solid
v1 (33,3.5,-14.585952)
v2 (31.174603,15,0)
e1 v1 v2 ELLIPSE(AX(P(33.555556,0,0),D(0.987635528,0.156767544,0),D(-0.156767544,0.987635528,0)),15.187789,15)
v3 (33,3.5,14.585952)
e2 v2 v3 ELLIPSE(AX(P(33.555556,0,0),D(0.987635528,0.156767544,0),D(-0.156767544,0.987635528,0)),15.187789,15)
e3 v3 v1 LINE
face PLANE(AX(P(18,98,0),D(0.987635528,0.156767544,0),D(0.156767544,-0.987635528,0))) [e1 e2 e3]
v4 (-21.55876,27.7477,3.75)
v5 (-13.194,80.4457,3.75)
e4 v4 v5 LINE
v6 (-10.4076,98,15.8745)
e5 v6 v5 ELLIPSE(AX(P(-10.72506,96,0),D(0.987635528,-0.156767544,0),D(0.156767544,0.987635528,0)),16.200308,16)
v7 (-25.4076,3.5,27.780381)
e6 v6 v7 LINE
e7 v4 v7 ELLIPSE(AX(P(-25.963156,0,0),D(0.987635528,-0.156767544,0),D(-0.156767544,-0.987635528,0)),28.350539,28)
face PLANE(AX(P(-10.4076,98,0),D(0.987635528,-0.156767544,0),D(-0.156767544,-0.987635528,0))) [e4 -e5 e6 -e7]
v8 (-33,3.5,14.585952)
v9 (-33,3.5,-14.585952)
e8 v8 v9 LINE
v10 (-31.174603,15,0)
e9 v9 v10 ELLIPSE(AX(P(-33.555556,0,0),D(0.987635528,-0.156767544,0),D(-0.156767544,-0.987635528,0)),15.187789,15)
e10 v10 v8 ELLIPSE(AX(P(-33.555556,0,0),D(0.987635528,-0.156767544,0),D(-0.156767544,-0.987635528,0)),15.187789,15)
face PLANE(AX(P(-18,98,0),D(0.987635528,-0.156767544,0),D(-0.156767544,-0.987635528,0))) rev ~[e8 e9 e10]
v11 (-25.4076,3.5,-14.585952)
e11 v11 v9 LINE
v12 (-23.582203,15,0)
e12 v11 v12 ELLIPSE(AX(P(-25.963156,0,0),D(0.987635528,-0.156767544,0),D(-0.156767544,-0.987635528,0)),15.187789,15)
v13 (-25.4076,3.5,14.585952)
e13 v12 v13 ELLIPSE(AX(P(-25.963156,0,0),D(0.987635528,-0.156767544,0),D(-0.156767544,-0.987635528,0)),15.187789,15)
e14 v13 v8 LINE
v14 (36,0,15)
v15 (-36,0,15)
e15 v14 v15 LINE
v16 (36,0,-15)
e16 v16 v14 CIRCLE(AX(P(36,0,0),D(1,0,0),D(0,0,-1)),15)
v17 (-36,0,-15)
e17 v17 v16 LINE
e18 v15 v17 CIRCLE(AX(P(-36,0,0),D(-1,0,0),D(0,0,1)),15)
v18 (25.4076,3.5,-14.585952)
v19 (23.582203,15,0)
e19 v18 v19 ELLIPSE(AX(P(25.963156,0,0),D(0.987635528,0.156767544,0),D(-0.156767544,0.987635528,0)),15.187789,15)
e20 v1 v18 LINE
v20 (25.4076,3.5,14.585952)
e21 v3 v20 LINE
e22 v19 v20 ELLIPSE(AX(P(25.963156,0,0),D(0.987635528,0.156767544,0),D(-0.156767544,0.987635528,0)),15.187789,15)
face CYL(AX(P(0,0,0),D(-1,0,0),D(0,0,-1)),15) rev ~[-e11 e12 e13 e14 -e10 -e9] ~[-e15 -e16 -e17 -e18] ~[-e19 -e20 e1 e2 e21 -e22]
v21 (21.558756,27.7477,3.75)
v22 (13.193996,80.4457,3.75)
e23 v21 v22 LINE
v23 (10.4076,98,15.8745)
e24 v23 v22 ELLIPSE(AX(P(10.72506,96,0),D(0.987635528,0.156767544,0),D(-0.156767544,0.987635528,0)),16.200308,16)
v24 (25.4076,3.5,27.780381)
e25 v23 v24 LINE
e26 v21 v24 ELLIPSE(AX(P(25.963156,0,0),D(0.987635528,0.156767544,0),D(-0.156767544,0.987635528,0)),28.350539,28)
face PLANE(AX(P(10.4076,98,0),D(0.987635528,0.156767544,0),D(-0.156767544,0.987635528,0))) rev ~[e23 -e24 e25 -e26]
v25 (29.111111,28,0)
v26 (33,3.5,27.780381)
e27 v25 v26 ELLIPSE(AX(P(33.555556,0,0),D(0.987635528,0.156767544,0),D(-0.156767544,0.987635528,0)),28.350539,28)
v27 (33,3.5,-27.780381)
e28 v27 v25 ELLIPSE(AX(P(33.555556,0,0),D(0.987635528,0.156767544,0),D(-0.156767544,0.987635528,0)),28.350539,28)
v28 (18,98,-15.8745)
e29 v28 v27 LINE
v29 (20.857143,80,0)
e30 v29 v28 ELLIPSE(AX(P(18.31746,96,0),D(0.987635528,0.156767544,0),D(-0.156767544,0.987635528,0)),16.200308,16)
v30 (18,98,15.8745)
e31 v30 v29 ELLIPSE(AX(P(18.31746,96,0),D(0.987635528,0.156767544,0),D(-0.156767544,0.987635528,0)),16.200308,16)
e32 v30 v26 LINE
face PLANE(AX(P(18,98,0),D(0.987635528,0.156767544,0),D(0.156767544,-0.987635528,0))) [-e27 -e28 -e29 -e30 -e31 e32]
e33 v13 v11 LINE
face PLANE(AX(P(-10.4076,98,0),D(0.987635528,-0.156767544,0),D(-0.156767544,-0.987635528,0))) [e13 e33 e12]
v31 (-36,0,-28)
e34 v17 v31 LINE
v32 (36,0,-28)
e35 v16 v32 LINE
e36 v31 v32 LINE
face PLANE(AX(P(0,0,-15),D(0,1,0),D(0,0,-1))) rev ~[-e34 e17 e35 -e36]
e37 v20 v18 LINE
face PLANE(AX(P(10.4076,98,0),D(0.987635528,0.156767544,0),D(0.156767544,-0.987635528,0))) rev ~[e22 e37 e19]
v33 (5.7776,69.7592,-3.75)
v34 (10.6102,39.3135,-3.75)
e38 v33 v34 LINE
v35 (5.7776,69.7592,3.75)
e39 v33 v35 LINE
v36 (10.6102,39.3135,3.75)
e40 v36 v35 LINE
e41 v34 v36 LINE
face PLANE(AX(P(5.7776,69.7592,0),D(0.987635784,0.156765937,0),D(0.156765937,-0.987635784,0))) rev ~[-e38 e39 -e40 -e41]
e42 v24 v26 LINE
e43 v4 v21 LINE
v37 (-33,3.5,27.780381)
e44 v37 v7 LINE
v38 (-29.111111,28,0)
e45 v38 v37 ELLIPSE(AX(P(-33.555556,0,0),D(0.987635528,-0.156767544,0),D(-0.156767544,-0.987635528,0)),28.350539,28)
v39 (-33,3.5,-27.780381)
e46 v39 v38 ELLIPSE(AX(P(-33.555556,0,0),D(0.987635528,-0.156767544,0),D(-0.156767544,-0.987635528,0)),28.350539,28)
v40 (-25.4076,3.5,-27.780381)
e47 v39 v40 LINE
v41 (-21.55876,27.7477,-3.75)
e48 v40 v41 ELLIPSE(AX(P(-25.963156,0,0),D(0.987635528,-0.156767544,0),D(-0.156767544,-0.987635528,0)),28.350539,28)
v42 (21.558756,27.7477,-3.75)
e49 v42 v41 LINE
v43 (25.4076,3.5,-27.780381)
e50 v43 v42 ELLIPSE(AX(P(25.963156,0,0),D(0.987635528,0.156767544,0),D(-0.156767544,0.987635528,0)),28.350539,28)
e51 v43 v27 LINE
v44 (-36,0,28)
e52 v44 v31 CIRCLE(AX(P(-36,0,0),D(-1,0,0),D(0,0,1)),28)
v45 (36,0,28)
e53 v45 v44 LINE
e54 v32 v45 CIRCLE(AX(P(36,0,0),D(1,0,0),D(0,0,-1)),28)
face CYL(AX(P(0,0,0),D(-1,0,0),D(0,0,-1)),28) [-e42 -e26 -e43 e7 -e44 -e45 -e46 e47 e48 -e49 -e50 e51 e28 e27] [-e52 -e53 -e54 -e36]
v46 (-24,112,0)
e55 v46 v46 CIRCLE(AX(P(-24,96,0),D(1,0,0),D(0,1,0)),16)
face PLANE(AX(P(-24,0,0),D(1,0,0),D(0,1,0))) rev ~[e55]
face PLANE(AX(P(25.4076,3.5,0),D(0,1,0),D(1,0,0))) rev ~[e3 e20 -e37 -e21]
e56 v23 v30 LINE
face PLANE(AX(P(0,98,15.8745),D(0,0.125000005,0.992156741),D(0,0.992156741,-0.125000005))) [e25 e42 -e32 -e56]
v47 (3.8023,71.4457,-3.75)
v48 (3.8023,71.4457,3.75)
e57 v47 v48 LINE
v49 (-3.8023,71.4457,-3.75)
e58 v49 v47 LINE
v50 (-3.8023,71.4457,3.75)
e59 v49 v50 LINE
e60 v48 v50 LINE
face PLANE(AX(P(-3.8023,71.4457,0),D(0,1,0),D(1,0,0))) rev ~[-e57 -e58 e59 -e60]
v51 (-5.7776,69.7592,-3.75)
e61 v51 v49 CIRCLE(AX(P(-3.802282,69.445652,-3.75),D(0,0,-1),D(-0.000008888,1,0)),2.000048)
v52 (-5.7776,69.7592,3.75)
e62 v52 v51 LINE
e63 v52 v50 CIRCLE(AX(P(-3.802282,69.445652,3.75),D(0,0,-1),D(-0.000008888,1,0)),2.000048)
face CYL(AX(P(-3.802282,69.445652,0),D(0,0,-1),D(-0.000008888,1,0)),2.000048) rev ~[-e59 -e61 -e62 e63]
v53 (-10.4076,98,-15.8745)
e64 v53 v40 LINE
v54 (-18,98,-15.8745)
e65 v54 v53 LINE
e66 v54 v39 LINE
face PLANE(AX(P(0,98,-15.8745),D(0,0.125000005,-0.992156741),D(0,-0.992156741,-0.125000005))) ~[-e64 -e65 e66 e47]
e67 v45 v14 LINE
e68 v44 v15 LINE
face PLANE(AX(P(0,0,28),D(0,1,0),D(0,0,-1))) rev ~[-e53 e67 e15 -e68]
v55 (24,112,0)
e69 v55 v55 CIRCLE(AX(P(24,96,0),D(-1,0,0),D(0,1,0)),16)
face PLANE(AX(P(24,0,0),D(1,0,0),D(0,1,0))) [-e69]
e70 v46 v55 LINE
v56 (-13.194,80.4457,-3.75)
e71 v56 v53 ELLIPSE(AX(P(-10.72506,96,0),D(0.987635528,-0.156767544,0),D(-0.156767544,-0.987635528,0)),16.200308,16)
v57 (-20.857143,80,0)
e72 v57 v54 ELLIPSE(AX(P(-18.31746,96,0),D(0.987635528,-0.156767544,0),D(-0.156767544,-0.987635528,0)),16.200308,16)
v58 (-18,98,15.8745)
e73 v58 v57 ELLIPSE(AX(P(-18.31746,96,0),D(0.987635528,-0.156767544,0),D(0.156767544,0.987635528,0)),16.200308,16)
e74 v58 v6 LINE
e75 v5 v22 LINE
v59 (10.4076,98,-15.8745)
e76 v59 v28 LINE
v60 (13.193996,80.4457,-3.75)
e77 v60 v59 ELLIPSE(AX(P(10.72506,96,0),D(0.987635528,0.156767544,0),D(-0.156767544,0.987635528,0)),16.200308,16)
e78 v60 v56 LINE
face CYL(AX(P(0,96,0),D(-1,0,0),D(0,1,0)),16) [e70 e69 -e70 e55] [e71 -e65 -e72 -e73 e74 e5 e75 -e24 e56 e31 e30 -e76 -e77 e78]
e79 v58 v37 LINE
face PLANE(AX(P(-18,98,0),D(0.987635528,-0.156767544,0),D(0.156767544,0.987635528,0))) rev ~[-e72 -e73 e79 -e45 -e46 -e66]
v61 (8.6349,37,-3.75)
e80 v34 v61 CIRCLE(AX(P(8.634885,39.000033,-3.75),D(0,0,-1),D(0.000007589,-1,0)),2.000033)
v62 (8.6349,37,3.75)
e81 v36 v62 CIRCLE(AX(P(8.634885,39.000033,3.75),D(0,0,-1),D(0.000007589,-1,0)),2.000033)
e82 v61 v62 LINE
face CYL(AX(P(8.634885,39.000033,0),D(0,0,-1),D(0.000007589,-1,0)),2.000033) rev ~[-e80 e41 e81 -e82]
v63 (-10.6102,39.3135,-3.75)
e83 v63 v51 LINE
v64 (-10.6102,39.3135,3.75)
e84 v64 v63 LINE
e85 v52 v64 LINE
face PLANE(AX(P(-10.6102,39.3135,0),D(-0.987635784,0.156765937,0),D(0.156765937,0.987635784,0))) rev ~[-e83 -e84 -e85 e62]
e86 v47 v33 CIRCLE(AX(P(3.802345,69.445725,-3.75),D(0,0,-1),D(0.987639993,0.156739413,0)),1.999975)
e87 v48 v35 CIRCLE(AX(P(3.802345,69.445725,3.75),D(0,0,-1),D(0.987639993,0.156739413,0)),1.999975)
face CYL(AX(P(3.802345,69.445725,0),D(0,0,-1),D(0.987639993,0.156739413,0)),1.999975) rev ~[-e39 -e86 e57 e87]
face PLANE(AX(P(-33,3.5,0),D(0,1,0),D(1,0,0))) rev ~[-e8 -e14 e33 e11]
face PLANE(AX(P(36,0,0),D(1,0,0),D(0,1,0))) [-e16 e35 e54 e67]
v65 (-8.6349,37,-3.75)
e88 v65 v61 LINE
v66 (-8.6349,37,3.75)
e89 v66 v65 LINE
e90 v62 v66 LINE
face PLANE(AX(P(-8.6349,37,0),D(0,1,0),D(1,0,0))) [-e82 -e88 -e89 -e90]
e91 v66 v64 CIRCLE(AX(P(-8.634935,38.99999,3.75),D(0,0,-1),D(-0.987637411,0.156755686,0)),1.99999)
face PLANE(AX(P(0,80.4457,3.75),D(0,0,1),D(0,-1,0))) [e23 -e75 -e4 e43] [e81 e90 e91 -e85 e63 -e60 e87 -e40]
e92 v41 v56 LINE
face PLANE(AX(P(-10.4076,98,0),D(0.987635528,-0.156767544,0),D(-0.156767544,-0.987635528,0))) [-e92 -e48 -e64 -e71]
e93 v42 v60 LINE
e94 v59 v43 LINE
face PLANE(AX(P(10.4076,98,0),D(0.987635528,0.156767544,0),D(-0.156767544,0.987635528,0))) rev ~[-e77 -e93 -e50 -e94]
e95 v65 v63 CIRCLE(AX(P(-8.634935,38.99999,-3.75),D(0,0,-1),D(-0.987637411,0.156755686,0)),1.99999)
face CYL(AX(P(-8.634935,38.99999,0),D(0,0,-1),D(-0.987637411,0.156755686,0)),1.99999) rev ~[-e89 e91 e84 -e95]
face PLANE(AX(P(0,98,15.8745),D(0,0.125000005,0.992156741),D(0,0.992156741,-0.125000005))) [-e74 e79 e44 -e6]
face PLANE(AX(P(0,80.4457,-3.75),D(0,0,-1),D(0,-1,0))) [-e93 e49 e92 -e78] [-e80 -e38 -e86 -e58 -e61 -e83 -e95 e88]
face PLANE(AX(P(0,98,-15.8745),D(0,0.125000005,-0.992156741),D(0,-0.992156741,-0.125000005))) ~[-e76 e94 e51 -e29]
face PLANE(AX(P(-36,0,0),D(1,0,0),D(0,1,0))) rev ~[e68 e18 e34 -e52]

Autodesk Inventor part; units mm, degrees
ref_plane "YZ Plane" through (0, 0, 0) normal (1, 0, 0) x (0, 1, 0)
ref_plane "XZ Plane" through (0, 0, 0) normal (0, 1, 0) x (-1, 0, 0)
sketch "Schizzo1" plane through (0, 0, 0) normal (1, 0, 0) x (0, 1, 0)
  circle A0 centre (96, 0) radius 10
  circle A1 centre (96, 0) radius 16
  arc A2 (0, -15) -> (0, 15) centre (0, 0) ccw
  arc A3 (0, -28) -> (0, 28) centre (0, 0) ccw
  line L0 (0, 28) -> (0, 15)
  line L1 (0, -15) -> (0, -28)
  line L2 (0, -8.9606) -> (0, 0)
  line L3 (0, 0) -> (192, 0)
  line L4 (3.5, 27.7804) -> (98, 15.8745)
  line L5 (98, -15.8745) -> (3.5, -27.7804)
  line L6 (0, 15) -> (0, -15)
  point P0 (9.0471, 0)
  point P1 (0, -4.4803)
  dimension "d0" = 20
  dimension "d1" = 15
  dimension "d2" = 96
  dimension "d3" = 28
  dimension "d4" = 32
extrude "Estrusione1" add sketch "Schizzo1" along normal mid plane 48 contours L3 A0 | L3 A1 A0 | A0 L3 A1 | A0 L3
extrude "Estrusione2" add sketch "Schizzo1" along normal mid plane 72 contours L3 A2 L0 A3 | A3 L1 A2 L3
sketch "Schizzo3" plane through (0, 0, 0) normal (1, 0, 0) x (0, 1, 0)
  line L0 (98, 15.8745) -> (3.5, 27.7804)
  circle A0 centre (96, 0) radius 16 projected
  arc A1 (0, -28) -> (0, 28) centre (0, 0) ccw projected
ref_plane "Piano di lavoro2" through (0, 98, 15.8745) normal (0, 0.125, 0.9921567) x (-1, 0, 0)
sketch "Schizzo4" plane through (0, 98, 15.8745) normal (0, 0.125, 0.9921567) x (-1, 0, 0)
  line L0 (24, -16) -> (24, 16) projected
  line L1 (-24, 16) -> (-24, -16) projected
  line L2 (36, 67.247) -> (36, 98.747) projected
  line L3 (-36, 98.747) -> (-36, 67.247) projected
  line L4 (0, 95.247) -> (0, 93.372) construction
  line L5 (-18, 0) -> (-33, 95.247)
  line L6 (-10.4076, 0) -> (-25.4076, 95.247)
  line L7 (18, 0) -> (33, 95.247)
  line L8 (10.4076, 0) -> (25.4076, 95.247)
  line L9 (0, 0) -> (0, 95.247) projected
  line L10 (18, 0) -> (10.4076, 0)
  line L11 (-10.4076, 0) -> (-18, 0)
  line L12 (-25.4076, 95.247) -> (-33, 95.247)
  line L13 (36, 93.372) -> (-36, 93.372) projected
  line L14 (33, 95.247) -> (25.4076, 95.247)
  line L15 (36, 97.122) -> (-36, 97.122) projected
  point P0 (36, 91.747)
  point P1 (-36, 91.747)
  dimension "d10" = 7.5
  dimension "d11" = 36
  dimension "d12" = 66
sketch "Schizzo6" plane through (0, 0, 0) normal (0, 0, 1) x (1, 0, 0)
  line L0 (-18, 98) -> (-33, 3.5) projected
  line L1 (-10.4076, 98) -> (-25.4076, 3.5) projected
  line L2 (10.4076, 98) -> (25.4076, 3.5) projected
  line L3 (18, 98) -> (33, 3.5) projected
  line L4 (-36, 0) -> (36, 0) projected
  line L5 (36, 0) -> (36, 0) projected
  line L6 (36, 0) -> (-36, 0) projected
  line L7 (-36, 0) -> (-36, 0) projected
  line L8 (-33, 3.5) -> (-25.4076, 3.5) projected
  line L9 (25.4076, 3.5) -> (33, 3.5) projected
  line L10 (-18, 98) -> (-10.4076, 98) projected
  line L11 (10.4076, 98) -> (18, 98) projected
  point P0 (0, 0)
extrude "Estrusione4" add sketch "Schizzo6" along normal up to surface surface through (0, 98, 15.8745) normal (0, 0.125, 0.9921567)
mirror "Specchio1" about plane through (0, 0, 0) normal (0, 0, 1) of "Estrusione4"
sketch "Schizzo8" plane through (0, 0, 0) normal (1, 0, 0) x (0, 1, 0)
  circle A0 centre (96, 0) radius 16 projected
  arc A1 (0, -28) -> (0, 28) centre (0, 0) ccw projected
  line L0 (80.4457, 3.75) -> (27.7477, 3.75)
  line L1 (80.4457, -3.75) -> (27.7477, -3.75)
  line L2 (-22.7749, 0) -> (136.6494, 0) construction
  dimension "d17" = 7.5
extrude "Estrusione5" add sketch "Schizzo8" along normal up to surface contours A0 L1 A1 L0 surface through (10.4076, 98, 0) normal (-0.9876355, -0.1567675, 0)
extrude "Estrusione6" add sketch "Schizzo8" against normal up to surface contours A0 L1 A1 L0 surface through (-25.4076, 3.5, 0) normal (0.9876355, -0.1567675, 0)
sketch "Schizzo9" plane through (0, 0, 0) normal (0, 0, 1) x (1, 0, 0)
  line L0 (-50.4, 0) -> (50.4, 0) projected
  line L1 (0, -22.7749) -> (0, 136.6494) projected
  line L2 (-36, 28) -> (36, 28) projected
  line L3 (-13.194, 80.4457) -> (-21.5587, 27.7477) projected
  line L4 (21.5587, 27.7477) -> (13.194, 80.4457) projected
  line L5 (13.194, 80.4457) -> (-13.194, 80.4457) projected
  line L6 (-8.6349, 37) -> (8.6349, 37)
  line L7 (-10.6102, 39.3135) -> (-5.7776, 69.7592)
  line L8 (-3.8023, 71.4457) -> (3.8023, 71.4457)
  line L9 (5.7776, 69.7592) -> (10.6102, 39.3135)
  arc A0 (-3.8023, 71.4457) -> (-5.7776, 69.7592) centre (-3.8023, 69.4457) ccw
  arc A1 (5.7776, 69.7592) -> (3.8023, 71.4457) centre (3.8023, 69.4457) ccw
  arc A2 (-10.6102, 39.3135) -> (-8.6349, 37) centre (-8.6349, 39) ccw
  arc A3 (8.6349, 37) -> (10.6102, 39.3135) centre (8.6349, 39) ccw
  point P0 (0, 0)
  dimension "d22" = 9
  dimension "d23" = 9
  dimension "d24" = 2
extrude "Estrusione7" cut sketch "Schizzo9" along normal through all both and the other way through all contours L6 A2 L7 A0 L8 L1 | L1 L8 A1 L9 A3 L6
properties part number "05-15-2023 esercizi_piani parallaleli"
